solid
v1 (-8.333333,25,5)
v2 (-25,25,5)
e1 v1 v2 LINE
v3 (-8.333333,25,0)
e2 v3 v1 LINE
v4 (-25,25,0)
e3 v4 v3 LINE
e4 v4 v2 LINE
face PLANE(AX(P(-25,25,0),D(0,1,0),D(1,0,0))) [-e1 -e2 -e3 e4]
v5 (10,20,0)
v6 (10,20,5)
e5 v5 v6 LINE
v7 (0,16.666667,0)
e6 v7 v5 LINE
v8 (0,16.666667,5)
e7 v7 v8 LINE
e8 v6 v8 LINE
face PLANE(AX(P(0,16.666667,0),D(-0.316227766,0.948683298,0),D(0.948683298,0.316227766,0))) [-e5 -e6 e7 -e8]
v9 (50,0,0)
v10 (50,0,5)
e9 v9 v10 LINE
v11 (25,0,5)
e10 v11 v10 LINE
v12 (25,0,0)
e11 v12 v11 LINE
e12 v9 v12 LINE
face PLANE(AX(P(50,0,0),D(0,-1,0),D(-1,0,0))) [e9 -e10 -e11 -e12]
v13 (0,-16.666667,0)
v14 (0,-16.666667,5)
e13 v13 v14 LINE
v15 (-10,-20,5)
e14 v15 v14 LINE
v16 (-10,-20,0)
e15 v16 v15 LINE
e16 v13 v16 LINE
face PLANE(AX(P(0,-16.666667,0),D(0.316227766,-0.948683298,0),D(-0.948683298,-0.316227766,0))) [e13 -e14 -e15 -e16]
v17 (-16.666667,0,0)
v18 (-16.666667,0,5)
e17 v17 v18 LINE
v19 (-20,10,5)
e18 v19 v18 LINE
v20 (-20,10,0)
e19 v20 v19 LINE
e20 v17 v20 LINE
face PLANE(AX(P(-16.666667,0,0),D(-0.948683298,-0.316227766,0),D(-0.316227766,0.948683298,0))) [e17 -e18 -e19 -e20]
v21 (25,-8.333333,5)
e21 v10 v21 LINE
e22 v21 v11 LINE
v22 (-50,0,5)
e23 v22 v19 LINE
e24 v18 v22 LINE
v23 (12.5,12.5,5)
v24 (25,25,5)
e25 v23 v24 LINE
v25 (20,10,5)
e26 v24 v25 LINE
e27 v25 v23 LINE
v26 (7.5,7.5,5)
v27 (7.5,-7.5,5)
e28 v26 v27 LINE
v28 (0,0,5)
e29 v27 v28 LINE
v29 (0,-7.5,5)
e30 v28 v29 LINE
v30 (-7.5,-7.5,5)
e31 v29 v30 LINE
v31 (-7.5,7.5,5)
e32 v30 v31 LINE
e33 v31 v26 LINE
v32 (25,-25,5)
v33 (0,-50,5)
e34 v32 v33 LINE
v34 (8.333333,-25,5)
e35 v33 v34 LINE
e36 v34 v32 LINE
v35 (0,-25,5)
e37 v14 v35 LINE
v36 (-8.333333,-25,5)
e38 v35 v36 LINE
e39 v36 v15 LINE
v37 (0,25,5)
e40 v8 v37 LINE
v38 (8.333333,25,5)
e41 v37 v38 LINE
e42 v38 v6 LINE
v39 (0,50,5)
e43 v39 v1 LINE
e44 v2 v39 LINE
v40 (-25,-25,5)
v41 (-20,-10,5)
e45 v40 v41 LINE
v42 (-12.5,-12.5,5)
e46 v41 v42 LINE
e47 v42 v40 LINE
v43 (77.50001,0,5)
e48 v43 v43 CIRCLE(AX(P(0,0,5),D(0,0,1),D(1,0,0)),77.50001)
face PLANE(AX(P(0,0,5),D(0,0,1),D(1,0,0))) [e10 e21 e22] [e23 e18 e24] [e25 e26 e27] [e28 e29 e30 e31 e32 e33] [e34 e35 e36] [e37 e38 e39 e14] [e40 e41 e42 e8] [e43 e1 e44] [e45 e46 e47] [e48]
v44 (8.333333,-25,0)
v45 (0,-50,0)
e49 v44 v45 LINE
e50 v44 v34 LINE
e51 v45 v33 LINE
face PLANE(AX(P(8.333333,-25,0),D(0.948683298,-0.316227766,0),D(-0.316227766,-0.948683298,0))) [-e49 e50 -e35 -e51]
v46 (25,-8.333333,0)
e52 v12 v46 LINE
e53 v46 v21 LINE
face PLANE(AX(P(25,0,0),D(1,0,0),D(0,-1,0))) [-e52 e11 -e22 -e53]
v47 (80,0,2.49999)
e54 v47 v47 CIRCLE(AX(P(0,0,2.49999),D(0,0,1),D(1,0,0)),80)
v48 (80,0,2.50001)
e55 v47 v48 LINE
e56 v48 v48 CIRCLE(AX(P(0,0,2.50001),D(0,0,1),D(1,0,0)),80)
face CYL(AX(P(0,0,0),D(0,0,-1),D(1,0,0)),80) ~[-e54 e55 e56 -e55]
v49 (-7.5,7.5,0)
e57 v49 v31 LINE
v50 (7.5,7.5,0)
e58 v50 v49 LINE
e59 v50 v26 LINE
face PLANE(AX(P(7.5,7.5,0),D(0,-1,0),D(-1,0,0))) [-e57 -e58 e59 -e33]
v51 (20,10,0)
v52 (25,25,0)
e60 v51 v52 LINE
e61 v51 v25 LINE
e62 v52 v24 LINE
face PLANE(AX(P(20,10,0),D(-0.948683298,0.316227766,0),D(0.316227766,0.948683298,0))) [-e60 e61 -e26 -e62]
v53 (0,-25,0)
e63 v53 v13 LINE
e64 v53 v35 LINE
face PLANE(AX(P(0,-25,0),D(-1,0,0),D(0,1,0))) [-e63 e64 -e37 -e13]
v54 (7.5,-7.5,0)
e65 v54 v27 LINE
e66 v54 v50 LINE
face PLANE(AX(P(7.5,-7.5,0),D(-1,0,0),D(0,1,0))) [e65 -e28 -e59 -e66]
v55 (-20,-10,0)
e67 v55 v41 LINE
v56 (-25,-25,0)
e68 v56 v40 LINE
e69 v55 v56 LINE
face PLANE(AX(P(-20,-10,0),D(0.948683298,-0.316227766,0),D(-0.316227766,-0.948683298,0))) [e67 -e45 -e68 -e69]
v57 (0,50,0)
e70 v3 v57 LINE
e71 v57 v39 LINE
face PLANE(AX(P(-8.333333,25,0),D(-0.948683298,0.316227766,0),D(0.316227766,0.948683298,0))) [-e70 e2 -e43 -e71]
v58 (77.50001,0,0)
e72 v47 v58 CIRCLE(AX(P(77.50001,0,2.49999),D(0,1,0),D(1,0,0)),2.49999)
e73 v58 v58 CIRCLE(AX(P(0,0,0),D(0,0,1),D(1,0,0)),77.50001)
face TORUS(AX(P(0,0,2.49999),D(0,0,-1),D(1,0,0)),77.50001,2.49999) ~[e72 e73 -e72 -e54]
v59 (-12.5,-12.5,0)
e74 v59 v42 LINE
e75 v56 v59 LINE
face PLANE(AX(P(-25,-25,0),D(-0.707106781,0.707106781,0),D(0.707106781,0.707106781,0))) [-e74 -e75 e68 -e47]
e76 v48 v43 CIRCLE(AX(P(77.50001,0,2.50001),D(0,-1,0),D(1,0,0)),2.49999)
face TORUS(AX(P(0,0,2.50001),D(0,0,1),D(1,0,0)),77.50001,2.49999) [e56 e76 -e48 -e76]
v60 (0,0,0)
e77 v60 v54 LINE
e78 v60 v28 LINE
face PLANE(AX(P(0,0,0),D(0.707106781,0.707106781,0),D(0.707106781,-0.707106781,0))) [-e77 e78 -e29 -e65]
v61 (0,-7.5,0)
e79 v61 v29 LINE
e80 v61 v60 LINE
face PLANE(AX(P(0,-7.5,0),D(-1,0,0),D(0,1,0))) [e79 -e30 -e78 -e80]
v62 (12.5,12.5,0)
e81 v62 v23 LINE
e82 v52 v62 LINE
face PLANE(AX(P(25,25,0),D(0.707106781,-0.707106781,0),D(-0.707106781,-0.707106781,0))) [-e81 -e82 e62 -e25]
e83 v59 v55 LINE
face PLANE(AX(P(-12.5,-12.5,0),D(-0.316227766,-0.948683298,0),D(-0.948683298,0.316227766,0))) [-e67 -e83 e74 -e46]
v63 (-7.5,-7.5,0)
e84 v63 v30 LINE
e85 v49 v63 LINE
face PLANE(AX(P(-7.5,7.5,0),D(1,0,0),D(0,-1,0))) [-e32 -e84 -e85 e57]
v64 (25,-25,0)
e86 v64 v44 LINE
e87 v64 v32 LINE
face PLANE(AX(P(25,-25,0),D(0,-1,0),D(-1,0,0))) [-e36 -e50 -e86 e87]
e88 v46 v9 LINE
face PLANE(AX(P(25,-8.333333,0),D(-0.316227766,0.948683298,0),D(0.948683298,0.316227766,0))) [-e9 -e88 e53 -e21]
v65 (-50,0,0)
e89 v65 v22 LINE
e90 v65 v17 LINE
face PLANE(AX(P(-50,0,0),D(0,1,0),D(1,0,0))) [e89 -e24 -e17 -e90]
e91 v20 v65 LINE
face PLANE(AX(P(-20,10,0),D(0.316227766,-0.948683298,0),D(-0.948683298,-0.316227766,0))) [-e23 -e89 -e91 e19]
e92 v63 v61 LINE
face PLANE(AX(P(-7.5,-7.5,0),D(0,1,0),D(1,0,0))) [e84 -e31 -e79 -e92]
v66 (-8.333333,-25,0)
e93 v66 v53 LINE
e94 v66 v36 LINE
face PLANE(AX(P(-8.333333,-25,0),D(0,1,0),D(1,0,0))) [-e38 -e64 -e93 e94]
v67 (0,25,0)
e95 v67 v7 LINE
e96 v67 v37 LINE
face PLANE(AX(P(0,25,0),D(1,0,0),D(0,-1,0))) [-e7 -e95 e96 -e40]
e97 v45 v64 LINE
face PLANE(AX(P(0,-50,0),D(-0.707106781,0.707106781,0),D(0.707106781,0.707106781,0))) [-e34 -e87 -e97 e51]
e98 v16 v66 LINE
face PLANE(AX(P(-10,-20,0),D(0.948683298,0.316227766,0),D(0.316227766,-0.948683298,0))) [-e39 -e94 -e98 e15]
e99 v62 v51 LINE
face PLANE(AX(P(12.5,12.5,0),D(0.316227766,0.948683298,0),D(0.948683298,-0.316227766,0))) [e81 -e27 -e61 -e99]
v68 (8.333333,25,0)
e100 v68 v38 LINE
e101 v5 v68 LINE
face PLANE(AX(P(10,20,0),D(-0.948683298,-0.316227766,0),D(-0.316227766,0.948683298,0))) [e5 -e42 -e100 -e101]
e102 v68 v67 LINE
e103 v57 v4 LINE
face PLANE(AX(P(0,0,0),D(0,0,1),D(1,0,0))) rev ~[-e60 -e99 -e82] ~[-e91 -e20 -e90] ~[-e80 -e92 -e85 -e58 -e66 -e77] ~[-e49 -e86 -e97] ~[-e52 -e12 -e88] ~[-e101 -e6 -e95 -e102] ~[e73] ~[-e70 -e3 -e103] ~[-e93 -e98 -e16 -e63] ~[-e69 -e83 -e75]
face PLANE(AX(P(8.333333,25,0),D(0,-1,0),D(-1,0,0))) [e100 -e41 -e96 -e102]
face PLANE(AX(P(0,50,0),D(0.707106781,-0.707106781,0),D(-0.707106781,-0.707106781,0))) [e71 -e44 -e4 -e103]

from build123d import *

# Parameters (mm, degrees)
F0_R     = 80
F1_DEPTH = 5
F3_DEPTH = 10
F4_R     = 2.49999
F5_DEPTH = 25


# Not quite as in the source:
# - a fillet or chamfer is up to 0.001 mm smaller than in the source, because OpenCascade refuses the exact size


with BuildPart() as f1:
    # F0 (on Top) → F1 (new body)
    with BuildSketch(Plane.XY):
        Circle(F0_R)
    extrude(amount=F1_DEPTH)

    # F2 (on Top) → F3 (cut)
    with BuildSketch(Plane.XY):
        Polygon((0, 50), (-25, 25), (-8.3333333333, 25), align=None)
        Polygon((-50, 0), (-16.6666666667, 0), (-20, 10), align=None)
        Polygon((-25, -25), (-12.5, -12.5), (-20, -10), align=None)
        Polygon((0, -25), (0, -16.6666666667), (-10, -20), (-8.3333333333, -25), align=None)
        Polygon((0, -50), (25, -25), (8.3333333333, -25), align=None)
        Polygon((0, 25), (0, 16.6666666667), (10, 20), (8.3333333333, 25), align=None)
        Polygon((25, 25), (12.5, 12.5), (20, 10), align=None)
        Polygon((50, 0), (25, 0), (25, -8.3333333333), align=None)
    extrude(amount=F3_DEPTH, mode=Mode.SUBTRACT)

    # F4 (radius 2.5 in the source; OpenCascade refuses exactly that, so slightly less here)
    f4_edges = [f1.edges().sort_by_distance(p)[0] for p in [
        (-80, 0, 0),
        (-80, 0, 5),
    ]]
    fillet(f4_edges, radius=F4_R)

    # F2 (on Top) → F5 (cut)
    with BuildSketch(Plane.XY):
        Polygon((0, -7.5), (0, 0), (-7.5, -7.5), align=None)
        Polygon((-7.5, -7.5), (0, 0), (-7.5, 0), align=None)
        Polygon((-7.5, 0), (0, 0), (-7.5, 7.5), align=None)
        Polygon((-7.5, 7.5), (0, 0), (0, 7.5), align=None)
        Polygon((0, 7.5), (0, 0), (7.5, 7.5), align=None)
        Polygon((7.5, 7.5), (0, 0), (7.5, 0), align=None)
        Polygon((7.5, 0), (0, 0), (7.5, -7.5), align=None)
    extrude(amount=F5_DEPTH, mode=Mode.SUBTRACT)


solid = f1.part
